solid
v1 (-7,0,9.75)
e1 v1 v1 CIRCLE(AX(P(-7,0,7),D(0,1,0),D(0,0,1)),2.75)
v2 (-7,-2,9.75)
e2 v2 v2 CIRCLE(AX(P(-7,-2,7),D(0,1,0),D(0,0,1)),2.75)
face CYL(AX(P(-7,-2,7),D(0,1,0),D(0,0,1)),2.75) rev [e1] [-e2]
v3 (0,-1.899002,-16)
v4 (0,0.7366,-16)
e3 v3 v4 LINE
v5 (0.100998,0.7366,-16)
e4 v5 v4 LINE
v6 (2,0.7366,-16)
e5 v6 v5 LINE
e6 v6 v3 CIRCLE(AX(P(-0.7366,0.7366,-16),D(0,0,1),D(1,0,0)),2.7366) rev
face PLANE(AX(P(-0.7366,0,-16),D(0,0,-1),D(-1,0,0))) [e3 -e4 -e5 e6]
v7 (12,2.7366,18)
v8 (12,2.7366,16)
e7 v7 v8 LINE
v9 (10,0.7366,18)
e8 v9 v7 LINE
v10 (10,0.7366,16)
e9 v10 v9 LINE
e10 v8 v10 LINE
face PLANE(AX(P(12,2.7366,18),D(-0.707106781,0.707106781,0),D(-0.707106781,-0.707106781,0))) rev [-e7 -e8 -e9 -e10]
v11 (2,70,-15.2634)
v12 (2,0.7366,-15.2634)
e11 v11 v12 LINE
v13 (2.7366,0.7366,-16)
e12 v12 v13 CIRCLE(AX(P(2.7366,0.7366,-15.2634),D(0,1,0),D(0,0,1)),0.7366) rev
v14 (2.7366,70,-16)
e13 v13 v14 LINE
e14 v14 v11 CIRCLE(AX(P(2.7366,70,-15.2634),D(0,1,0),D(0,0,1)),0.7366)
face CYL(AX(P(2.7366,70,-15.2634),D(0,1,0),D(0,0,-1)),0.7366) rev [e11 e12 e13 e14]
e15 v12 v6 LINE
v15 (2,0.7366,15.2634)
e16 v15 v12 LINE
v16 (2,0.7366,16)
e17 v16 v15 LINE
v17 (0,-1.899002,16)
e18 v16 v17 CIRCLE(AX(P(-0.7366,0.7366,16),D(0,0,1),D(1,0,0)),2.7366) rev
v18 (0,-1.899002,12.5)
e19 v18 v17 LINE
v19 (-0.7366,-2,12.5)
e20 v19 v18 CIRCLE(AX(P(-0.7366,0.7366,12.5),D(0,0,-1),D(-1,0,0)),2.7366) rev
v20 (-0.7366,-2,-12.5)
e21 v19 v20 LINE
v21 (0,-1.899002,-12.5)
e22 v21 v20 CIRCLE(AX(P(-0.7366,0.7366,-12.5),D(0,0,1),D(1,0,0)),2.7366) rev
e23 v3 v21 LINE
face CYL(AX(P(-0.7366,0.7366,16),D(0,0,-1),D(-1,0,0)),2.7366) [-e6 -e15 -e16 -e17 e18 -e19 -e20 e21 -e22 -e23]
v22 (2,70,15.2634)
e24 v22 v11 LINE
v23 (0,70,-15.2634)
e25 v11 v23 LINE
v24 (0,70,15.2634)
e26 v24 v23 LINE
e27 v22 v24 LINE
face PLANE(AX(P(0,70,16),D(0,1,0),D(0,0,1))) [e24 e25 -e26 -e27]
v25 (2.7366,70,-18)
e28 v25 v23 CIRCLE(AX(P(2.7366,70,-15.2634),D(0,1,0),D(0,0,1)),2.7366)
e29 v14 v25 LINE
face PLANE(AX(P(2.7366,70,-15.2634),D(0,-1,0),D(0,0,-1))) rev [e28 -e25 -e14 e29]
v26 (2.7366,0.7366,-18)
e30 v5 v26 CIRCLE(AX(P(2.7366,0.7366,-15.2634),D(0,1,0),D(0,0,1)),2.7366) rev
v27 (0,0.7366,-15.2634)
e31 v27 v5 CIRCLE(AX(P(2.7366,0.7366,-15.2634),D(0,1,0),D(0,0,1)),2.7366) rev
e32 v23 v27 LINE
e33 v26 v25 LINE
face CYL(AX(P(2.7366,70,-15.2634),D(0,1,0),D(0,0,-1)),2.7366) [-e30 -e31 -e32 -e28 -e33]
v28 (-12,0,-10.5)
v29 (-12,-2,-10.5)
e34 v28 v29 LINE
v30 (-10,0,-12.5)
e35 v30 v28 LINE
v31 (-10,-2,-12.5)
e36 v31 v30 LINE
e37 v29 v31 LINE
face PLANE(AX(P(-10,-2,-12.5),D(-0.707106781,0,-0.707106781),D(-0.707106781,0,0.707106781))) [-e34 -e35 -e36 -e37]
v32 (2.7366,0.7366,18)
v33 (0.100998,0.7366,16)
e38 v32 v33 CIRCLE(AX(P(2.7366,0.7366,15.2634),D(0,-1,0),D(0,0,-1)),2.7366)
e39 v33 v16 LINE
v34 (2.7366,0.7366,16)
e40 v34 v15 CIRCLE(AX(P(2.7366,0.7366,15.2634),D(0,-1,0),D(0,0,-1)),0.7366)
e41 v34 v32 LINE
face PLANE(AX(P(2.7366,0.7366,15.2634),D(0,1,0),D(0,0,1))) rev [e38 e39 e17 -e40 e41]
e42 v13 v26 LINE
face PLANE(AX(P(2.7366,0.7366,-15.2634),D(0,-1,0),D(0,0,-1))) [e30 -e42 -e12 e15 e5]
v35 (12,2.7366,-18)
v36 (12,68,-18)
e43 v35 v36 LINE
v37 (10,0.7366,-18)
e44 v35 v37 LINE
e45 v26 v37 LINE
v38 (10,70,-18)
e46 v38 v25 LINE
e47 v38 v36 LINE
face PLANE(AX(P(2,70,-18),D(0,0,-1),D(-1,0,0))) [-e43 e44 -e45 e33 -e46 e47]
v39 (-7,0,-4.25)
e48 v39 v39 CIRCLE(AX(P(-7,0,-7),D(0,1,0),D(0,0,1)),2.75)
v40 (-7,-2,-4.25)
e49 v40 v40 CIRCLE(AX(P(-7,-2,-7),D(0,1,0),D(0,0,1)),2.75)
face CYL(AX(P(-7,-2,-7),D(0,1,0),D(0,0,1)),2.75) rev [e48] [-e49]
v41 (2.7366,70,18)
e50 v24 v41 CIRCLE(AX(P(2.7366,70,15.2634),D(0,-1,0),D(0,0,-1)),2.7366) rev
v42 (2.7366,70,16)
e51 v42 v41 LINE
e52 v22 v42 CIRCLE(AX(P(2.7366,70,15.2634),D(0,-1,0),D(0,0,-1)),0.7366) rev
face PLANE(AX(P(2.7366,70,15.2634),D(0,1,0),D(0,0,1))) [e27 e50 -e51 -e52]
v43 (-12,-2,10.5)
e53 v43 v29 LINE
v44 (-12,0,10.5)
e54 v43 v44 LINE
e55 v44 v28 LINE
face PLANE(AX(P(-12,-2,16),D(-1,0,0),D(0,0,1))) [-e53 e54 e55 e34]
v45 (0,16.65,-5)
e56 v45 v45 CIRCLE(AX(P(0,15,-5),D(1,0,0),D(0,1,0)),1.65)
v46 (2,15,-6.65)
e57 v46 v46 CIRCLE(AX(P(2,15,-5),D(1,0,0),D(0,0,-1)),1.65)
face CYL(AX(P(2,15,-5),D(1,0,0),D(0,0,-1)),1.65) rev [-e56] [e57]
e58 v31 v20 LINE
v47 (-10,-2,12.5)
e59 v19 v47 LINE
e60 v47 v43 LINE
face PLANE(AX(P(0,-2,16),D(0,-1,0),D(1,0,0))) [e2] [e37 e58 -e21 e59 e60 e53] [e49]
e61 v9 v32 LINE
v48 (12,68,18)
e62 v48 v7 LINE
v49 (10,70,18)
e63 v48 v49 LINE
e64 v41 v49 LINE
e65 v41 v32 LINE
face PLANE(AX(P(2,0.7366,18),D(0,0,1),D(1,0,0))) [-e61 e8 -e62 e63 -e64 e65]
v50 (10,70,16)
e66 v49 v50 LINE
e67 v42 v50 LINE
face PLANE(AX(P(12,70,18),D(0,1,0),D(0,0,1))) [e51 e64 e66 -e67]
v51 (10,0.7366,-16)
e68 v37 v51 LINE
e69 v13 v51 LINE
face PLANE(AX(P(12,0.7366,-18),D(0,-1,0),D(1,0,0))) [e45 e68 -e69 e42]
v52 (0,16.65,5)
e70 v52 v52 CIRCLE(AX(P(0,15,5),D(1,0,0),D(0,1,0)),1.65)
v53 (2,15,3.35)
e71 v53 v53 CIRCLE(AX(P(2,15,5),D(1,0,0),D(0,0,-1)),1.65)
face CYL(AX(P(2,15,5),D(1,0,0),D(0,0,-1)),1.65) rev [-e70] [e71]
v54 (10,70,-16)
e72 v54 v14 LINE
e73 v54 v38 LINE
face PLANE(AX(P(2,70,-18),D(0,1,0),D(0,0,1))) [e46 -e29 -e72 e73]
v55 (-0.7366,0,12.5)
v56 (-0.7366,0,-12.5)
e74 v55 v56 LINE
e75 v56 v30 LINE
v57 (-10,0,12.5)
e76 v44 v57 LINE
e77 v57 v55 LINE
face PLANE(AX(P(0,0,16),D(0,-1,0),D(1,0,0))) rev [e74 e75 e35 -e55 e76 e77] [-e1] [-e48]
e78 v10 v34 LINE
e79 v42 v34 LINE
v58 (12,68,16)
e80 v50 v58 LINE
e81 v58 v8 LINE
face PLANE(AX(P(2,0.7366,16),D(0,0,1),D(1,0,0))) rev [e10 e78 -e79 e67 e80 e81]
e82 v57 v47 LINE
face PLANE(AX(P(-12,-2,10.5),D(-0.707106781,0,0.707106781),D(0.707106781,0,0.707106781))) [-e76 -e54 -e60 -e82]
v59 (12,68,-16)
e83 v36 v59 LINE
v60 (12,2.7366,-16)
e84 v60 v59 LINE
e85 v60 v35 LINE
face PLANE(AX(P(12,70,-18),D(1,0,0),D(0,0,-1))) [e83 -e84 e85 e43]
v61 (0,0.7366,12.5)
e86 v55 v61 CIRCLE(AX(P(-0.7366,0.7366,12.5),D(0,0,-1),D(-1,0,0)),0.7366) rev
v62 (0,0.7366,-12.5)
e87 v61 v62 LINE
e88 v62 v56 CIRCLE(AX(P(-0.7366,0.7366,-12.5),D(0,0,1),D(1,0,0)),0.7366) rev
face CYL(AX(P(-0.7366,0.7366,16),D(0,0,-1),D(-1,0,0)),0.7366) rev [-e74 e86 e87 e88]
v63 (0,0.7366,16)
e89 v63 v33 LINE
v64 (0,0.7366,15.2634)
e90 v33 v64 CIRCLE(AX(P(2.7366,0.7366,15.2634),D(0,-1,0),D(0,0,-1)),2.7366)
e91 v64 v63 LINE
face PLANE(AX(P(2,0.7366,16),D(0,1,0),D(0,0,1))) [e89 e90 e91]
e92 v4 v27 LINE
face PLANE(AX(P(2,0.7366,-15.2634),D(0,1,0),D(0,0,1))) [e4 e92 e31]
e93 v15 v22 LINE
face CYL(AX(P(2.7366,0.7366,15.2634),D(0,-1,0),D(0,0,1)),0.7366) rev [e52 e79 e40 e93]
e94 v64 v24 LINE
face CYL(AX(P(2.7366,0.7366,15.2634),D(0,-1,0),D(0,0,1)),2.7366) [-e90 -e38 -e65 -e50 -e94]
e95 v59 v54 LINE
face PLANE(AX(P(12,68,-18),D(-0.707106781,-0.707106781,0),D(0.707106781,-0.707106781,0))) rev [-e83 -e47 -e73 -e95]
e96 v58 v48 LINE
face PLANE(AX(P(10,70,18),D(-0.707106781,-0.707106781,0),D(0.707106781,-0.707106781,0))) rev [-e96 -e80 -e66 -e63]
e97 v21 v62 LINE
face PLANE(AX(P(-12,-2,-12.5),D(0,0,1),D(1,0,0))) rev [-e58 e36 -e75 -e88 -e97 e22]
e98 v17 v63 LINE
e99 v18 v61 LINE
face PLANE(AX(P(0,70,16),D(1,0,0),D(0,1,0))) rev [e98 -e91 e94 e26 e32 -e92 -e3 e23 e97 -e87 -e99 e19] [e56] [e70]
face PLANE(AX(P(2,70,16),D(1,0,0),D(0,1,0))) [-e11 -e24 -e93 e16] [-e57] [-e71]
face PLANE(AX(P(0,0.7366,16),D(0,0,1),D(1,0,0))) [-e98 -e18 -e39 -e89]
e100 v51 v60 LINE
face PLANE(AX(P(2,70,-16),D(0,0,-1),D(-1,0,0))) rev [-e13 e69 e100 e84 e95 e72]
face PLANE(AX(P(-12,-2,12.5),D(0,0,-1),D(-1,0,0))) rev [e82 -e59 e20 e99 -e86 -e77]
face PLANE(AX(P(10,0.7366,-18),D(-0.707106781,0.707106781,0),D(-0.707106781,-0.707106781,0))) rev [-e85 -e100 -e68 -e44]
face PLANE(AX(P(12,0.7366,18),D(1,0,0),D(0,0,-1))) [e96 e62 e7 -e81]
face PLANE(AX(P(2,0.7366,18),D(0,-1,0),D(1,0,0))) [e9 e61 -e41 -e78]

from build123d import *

# Parameters (mm, degrees)
SM_BASE_FLANGE_1_DEPTH             = 16
SKETCH_3_R                         = 2.75
CUT_EXTRUDE_1_DEPTH                = 73.801098893
SKETCH_4_W                         = 12
SKETCH_4_H                         = 3.5
CUT_EXTRUDE_2_DEPTH                = 75.726166769
SM_EDGE_FLANGE_1_STRIP_W           = 9.4732
SM_EDGE_FLANGE_1_STRIP_H           = 2
SM_EDGE_FLANGE_1_STRIP_CUT_DEPTH   = 69.2634
SM_EDGE_FLANGE_1_STRIP_2_W         = 9.4732
SM_EDGE_FLANGE_1_STRIP_2_H         = 2
SM_EDGE_FLANGE_1_STRIP_CUT_2_DEPTH = 69.2634
SM_EDGE_FLANGE_1_DEPTH             = 69.2634
SM_EDGE_FLANGE_1_BEND_DEPTH        = 69.2634
M4X0_7_1_D                         = 3.3
M4X0_7_1_DEPTH                     = 10.1
M4X0_7_1_TIP                       = 0.991420021
CHAMFER_1_SIZE                     = 2


# Sheet-metal steps are written as plain solids
with BuildPart() as part:
    # Sketch 1 → 基体-法兰1 (new, symmetric)
    with BuildSketch(Plane.XY):
        with BuildLine():
            Line((0, 70), (0, 0.7366))
            ThreePointArc((0, 0.7366), (-0.215745145, 0.215745145), (-0.7366, 0))
            Line((-0.7366, 0), (-12, 0))
            Line((-12, 0), (-12, -2))
            Line((-12, -2), (-0.7366, -2))
            ThreePointArc((-0.7366, -2), (1.198468417, -1.198468417), (2, 0.7366))
            Line((2, 0.7366), (2, 70))
            Line((2, 70), (0, 70))
        make_face()
    extrude(amount=SM_BASE_FLANGE_1_DEPTH, both=True)

    # 草图3 → 切除-拉伸1 (cut, through all)
    with BuildSketch(Plane(origin=(0, 0, 0), x_dir=(1, 0, 0), z_dir=(0, 1, 0))):
        with Locations(Location((-7, 7, 0), (0, 0, 270))):
            Circle(SKETCH_3_R)
        with Locations(Location((-7, -7, 0), (0, 0, 270))):
            Circle(SKETCH_3_R)
    extrude(amount=-CUT_EXTRUDE_1_DEPTH, mode=Mode.SUBTRACT)

    # 草图4 → 切除-拉伸2 (cut, through all)
    with BuildSketch(Plane(origin=(0, 70, 0), x_dir=(1, 0, 0), z_dir=(0, 1, 0))):
        with Locations((-6, 14.25)):
            Rectangle(SKETCH_4_W, SKETCH_4_H)
        with Locations((-6, -14.25)):
            Rectangle(SKETCH_4_W, SKETCH_4_H)
    extrude(amount=-CUT_EXTRUDE_2_DEPTH, mode=Mode.SUBTRACT)

    # 边线-法兰1 strip (across the edge) → 边线-法兰1 strip cut (cut)
    with BuildSketch(Plane(origin=(2, 70, 16), x_dir=(0, 0, -1), z_dir=(0, -1, 0))):
        with Locations((-4, -1)):
            Rectangle(SM_EDGE_FLANGE_1_STRIP_W, SM_EDGE_FLANGE_1_STRIP_H)
    extrude(amount=SM_EDGE_FLANGE_1_STRIP_CUT_DEPTH, mode=Mode.SUBTRACT)

    # 边线-法兰1 strip 2 (across the edge) → 边线-法兰1 strip cut 2 (cut)
    with BuildSketch(Plane(origin=(2, 0.7366, -16), x_dir=(0, 0, 1), z_dir=(0, 1, 0))):
        with Locations((-4, -1)):
            Rectangle(SM_EDGE_FLANGE_1_STRIP_2_W, SM_EDGE_FLANGE_1_STRIP_2_H)
    extrude(amount=SM_EDGE_FLANGE_1_STRIP_CUT_2_DEPTH, mode=Mode.SUBTRACT)

    # 边线-法兰1 section (across the edge) → 边线-法兰1 (add)
    with BuildSketch(Plane(origin=(2, 70, 16), x_dir=(0, 0, -1), z_dir=(0, -1, 0))):
        with BuildLine():
            Line((-2, 0.7366), (-2, 10))
            Line((-2, 10), (0, 10))
            Line((0, 10), (0, 0.7366))
            ThreePointArc((0, 0.7366), (0.215745145, 0.215745145), (0.7366, 0))
            Line((0.7366, 0), (0.7366, -2))
            ThreePointArc((0.7366, -2), (-1.198468417, -1.198468417), (-2, 0.7366))
        make_face()
    extrude(amount=SM_EDGE_FLANGE_1_DEPTH)

    # 边线-法兰1 section 2 (across the edge) → 边线-法兰1 bend (add)
    with BuildSketch(Plane(origin=(2, 0.7366, -16), x_dir=(0, 0, 1), z_dir=(0, 1, 0))):
        with BuildLine():
            Line((-2, 0.7366), (-2, 10))
            Line((-2, 10), (0, 10))
            Line((0, 10), (0, 0.7366))
            ThreePointArc((0, 0.7366), (0.215745145, 0.215745145), (0.7366, 0))
            Line((0.7366, 0), (0.7366, -2))
            ThreePointArc((0.7366, -2), (-1.198468417, -1.198468417), (-2, 0.7366))
        make_face()
    extrude(amount=SM_EDGE_FLANGE_1_BEND_DEPTH)

    # M4x0.7 螺纹孔1
    with Locations(Plane(origin=(2, 0, 0), x_dir=(0, 0, -1), z_dir=(1, 0, 0))):
        with Locations((-5, 15), (5, 15)):
            Hole(M4X0_7_1_D / 2, depth=M4X0_7_1_DEPTH)
            with Locations((0, 0, -(M4X0_7_1_DEPTH + M4X0_7_1_TIP / 2))):  # 118° drill point
                Cone(0, M4X0_7_1_D / 2, M4X0_7_1_TIP, mode=Mode.SUBTRACT)

    # 倒角1
    chamfer_1_edges = [part.edges().sort_by_distance(p)[0] for p in [
        (12, 70, 17),
        (12, 0.7366, 17),
        (12, 0.7366, -17),
        (12, 70, -17),
        (-12, -1, -12.5),
        (-12, -1, 12.5),
    ]]
    chamfer(chamfer_1_edges, length=CHAMFER_1_SIZE)


solid = part.part
